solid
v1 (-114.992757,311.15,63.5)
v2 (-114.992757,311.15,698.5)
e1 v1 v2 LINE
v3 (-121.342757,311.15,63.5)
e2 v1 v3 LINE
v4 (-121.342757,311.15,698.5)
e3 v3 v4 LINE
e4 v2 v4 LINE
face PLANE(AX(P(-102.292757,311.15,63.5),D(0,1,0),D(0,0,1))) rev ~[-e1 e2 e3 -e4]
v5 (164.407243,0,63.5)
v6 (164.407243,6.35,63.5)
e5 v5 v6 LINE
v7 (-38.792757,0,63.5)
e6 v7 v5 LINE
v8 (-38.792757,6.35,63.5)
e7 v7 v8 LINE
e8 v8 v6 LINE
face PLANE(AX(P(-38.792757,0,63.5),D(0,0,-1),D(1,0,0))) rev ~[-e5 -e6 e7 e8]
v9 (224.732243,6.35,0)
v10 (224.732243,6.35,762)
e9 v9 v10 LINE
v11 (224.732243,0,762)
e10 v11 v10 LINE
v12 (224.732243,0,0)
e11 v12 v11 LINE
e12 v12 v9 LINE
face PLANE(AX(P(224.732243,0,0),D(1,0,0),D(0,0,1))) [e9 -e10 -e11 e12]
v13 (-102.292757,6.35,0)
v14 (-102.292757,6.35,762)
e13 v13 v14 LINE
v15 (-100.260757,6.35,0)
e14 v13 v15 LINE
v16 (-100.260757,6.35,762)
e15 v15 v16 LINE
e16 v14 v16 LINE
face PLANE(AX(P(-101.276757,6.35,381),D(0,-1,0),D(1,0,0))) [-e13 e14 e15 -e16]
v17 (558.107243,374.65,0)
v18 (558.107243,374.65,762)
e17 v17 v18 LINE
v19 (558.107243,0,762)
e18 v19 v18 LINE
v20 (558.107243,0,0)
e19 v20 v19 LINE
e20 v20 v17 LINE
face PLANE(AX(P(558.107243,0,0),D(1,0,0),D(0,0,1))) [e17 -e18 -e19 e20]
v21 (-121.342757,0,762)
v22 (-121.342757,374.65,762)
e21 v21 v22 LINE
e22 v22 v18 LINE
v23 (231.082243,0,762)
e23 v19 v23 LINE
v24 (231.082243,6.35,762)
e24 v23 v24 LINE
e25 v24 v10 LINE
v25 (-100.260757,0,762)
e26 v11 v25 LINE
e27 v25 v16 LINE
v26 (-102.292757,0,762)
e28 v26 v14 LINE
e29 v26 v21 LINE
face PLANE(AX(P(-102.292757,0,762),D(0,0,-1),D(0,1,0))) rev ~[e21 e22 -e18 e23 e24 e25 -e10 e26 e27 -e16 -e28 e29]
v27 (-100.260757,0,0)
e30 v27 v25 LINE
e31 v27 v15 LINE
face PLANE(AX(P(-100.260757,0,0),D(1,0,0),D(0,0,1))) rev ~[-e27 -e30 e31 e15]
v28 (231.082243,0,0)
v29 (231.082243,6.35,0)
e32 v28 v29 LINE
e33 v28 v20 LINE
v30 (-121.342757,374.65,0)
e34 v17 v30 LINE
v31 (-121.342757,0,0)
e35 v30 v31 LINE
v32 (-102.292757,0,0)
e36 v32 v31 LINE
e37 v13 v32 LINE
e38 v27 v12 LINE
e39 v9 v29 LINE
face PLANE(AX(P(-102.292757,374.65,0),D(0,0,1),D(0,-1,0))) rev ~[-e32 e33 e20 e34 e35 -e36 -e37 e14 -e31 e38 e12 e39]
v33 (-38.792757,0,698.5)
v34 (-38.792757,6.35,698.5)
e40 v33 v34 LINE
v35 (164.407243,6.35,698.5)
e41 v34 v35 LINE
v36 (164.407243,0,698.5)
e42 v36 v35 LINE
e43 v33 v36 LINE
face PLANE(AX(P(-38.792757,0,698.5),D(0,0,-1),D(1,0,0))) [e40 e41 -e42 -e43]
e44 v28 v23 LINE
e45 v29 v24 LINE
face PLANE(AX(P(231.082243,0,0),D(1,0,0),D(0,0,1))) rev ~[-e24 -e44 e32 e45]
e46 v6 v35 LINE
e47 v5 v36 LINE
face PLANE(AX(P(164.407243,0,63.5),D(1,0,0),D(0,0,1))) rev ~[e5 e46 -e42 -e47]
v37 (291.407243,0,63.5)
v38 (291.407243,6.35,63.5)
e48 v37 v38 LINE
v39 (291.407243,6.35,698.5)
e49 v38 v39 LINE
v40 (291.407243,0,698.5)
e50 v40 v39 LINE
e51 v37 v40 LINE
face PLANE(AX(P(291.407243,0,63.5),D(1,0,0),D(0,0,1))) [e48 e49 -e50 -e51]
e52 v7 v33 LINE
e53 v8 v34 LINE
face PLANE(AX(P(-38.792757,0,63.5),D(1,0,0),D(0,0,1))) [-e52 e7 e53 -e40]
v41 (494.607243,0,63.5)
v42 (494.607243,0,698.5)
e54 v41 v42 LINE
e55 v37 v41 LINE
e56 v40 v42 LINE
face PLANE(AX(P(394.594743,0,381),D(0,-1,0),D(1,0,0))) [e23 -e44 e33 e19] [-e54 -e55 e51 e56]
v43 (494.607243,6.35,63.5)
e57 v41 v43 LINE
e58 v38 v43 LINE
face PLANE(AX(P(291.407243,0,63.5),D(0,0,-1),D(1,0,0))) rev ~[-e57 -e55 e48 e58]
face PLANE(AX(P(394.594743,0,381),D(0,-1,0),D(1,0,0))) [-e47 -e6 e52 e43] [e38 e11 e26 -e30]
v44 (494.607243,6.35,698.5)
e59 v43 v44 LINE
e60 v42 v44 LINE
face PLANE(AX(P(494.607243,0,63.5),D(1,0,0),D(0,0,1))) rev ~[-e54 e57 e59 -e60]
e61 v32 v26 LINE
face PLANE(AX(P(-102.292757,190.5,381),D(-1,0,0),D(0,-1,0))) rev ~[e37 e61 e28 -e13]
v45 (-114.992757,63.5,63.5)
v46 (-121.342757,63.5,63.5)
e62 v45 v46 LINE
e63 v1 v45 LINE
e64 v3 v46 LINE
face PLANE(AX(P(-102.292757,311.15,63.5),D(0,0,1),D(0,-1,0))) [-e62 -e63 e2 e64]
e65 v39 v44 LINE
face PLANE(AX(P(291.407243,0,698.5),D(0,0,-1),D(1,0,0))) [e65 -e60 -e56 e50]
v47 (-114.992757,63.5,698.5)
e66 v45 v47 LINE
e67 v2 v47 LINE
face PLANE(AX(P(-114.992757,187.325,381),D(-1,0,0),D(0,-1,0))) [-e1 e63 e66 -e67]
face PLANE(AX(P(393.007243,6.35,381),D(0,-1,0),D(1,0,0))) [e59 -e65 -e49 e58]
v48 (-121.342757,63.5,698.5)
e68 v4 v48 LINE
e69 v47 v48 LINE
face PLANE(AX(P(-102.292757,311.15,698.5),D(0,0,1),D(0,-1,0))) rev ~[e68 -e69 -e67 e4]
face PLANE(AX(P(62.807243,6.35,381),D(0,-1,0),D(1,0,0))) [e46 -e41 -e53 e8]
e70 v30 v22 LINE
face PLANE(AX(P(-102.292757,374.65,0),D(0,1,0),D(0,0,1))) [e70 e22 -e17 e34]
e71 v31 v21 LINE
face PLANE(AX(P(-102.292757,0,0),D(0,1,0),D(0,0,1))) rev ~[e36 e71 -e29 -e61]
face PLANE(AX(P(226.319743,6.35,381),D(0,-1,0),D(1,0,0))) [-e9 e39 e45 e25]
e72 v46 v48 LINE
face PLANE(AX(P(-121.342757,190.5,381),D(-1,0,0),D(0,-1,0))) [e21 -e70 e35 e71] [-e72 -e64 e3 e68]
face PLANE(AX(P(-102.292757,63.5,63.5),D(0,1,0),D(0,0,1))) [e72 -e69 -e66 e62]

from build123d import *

# Parameters (mm, degrees)
F0_W     = 327.025
F0_H     = 762
F0_W_2   = 203.2
F0_H_2   = 635
F0_W_3   = 324.993
F0_W_4   = 3.175
F0_W_5   = 2.032
F1_DEPTH = 374.65
F2_DEPTH = 6.35
F3_W     = 368.3
F3_H     = 762
F3_W_2   = 247.65
F3_H_2   = 635
F3_W_3   = 6.35
F4_DEPTH = 19.05
F5_DEPTH = 12.7


# Not quite as in the source:
# - a feature names something its author has since deleted; it is built from what else it names


with BuildPart() as f1:
    # F0 (on Front) → F1 (new body)
    with BuildSketch(Plane.XZ):
        with Locations((394.5947425127, 381)):
            Rectangle(F0_W, F0_H)
        with Locations((393.0072425127, 381)):
            Rectangle(F0_W_2, F0_H_2, mode=Mode.SUBTRACT)
        with Locations((62.2357425127, 381)):
            Rectangle(F0_W_3, F0_H)
        with Locations((62.8072425127, 381)):
            Rectangle(F0_W_2, F0_H_2, mode=Mode.SUBTRACT)
        with Locations((62.8072425127, 381)):
            Rectangle(F0_W_2, F0_H_2)
        with Locations((393.0072425127, 381)):
            Rectangle(F0_W_2, F0_H_2)
        with Locations((226.3197425127, 381)):
            Rectangle(F0_W_4, F0_H)
        with Locations((229.4947425127, 381)):
            Rectangle(F0_W_4, F0_H)
        with Locations((-101.2767574873, 381)):
            Rectangle(F0_W_5, F0_H)
    extrude(amount=-F1_DEPTH)

    # F0 (on Front) → F2 (cut)
    with BuildSketch(Plane.XZ):
        with Locations((226.3197425127, 381)):
            Rectangle(F0_W_4, F0_H)
        with Locations((229.4947425127, 381)):
            Rectangle(F0_W_4, F0_H)
        with Locations((-101.2767574873, 381)):
            Rectangle(F0_W_5, F0_H)
        with Locations((62.8072425127, 381)):
            Rectangle(F0_W_2, F0_H_2)
        with Locations((393.0072425127, 381)):
            Rectangle(F0_W_2, F0_H_2)
    extrude(amount=-F2_DEPTH, mode=Mode.SUBTRACT)

    # F3 (on face) → F4 (join)
    with BuildSketch(Plane(origin=(-102.2927574873, 0, 0), x_dir=(0, -1, 0), z_dir=(-1, 0, 0))):
        with Locations((-190.5, 381)):
            Rectangle(F3_W, F3_H)
        with Locations((-187.325, 381)):
            Rectangle(F3_W_2, F3_H_2, mode=Mode.SUBTRACT)
        with Locations((-3.175, 381)):
            Rectangle(F3_W_3, F3_H)
    extrude(amount=F4_DEPTH)

    # F3 (on face) → F5 (join)
    with BuildSketch(Plane(origin=(-102.2927574873, 0, 0), x_dir=(0, -1, 0), z_dir=(-1, 0, 0))):
        with Locations((-187.325, 381)):
            Rectangle(F3_W_2, F3_H_2)
    extrude(amount=F5_DEPTH)


solid = f1.part
